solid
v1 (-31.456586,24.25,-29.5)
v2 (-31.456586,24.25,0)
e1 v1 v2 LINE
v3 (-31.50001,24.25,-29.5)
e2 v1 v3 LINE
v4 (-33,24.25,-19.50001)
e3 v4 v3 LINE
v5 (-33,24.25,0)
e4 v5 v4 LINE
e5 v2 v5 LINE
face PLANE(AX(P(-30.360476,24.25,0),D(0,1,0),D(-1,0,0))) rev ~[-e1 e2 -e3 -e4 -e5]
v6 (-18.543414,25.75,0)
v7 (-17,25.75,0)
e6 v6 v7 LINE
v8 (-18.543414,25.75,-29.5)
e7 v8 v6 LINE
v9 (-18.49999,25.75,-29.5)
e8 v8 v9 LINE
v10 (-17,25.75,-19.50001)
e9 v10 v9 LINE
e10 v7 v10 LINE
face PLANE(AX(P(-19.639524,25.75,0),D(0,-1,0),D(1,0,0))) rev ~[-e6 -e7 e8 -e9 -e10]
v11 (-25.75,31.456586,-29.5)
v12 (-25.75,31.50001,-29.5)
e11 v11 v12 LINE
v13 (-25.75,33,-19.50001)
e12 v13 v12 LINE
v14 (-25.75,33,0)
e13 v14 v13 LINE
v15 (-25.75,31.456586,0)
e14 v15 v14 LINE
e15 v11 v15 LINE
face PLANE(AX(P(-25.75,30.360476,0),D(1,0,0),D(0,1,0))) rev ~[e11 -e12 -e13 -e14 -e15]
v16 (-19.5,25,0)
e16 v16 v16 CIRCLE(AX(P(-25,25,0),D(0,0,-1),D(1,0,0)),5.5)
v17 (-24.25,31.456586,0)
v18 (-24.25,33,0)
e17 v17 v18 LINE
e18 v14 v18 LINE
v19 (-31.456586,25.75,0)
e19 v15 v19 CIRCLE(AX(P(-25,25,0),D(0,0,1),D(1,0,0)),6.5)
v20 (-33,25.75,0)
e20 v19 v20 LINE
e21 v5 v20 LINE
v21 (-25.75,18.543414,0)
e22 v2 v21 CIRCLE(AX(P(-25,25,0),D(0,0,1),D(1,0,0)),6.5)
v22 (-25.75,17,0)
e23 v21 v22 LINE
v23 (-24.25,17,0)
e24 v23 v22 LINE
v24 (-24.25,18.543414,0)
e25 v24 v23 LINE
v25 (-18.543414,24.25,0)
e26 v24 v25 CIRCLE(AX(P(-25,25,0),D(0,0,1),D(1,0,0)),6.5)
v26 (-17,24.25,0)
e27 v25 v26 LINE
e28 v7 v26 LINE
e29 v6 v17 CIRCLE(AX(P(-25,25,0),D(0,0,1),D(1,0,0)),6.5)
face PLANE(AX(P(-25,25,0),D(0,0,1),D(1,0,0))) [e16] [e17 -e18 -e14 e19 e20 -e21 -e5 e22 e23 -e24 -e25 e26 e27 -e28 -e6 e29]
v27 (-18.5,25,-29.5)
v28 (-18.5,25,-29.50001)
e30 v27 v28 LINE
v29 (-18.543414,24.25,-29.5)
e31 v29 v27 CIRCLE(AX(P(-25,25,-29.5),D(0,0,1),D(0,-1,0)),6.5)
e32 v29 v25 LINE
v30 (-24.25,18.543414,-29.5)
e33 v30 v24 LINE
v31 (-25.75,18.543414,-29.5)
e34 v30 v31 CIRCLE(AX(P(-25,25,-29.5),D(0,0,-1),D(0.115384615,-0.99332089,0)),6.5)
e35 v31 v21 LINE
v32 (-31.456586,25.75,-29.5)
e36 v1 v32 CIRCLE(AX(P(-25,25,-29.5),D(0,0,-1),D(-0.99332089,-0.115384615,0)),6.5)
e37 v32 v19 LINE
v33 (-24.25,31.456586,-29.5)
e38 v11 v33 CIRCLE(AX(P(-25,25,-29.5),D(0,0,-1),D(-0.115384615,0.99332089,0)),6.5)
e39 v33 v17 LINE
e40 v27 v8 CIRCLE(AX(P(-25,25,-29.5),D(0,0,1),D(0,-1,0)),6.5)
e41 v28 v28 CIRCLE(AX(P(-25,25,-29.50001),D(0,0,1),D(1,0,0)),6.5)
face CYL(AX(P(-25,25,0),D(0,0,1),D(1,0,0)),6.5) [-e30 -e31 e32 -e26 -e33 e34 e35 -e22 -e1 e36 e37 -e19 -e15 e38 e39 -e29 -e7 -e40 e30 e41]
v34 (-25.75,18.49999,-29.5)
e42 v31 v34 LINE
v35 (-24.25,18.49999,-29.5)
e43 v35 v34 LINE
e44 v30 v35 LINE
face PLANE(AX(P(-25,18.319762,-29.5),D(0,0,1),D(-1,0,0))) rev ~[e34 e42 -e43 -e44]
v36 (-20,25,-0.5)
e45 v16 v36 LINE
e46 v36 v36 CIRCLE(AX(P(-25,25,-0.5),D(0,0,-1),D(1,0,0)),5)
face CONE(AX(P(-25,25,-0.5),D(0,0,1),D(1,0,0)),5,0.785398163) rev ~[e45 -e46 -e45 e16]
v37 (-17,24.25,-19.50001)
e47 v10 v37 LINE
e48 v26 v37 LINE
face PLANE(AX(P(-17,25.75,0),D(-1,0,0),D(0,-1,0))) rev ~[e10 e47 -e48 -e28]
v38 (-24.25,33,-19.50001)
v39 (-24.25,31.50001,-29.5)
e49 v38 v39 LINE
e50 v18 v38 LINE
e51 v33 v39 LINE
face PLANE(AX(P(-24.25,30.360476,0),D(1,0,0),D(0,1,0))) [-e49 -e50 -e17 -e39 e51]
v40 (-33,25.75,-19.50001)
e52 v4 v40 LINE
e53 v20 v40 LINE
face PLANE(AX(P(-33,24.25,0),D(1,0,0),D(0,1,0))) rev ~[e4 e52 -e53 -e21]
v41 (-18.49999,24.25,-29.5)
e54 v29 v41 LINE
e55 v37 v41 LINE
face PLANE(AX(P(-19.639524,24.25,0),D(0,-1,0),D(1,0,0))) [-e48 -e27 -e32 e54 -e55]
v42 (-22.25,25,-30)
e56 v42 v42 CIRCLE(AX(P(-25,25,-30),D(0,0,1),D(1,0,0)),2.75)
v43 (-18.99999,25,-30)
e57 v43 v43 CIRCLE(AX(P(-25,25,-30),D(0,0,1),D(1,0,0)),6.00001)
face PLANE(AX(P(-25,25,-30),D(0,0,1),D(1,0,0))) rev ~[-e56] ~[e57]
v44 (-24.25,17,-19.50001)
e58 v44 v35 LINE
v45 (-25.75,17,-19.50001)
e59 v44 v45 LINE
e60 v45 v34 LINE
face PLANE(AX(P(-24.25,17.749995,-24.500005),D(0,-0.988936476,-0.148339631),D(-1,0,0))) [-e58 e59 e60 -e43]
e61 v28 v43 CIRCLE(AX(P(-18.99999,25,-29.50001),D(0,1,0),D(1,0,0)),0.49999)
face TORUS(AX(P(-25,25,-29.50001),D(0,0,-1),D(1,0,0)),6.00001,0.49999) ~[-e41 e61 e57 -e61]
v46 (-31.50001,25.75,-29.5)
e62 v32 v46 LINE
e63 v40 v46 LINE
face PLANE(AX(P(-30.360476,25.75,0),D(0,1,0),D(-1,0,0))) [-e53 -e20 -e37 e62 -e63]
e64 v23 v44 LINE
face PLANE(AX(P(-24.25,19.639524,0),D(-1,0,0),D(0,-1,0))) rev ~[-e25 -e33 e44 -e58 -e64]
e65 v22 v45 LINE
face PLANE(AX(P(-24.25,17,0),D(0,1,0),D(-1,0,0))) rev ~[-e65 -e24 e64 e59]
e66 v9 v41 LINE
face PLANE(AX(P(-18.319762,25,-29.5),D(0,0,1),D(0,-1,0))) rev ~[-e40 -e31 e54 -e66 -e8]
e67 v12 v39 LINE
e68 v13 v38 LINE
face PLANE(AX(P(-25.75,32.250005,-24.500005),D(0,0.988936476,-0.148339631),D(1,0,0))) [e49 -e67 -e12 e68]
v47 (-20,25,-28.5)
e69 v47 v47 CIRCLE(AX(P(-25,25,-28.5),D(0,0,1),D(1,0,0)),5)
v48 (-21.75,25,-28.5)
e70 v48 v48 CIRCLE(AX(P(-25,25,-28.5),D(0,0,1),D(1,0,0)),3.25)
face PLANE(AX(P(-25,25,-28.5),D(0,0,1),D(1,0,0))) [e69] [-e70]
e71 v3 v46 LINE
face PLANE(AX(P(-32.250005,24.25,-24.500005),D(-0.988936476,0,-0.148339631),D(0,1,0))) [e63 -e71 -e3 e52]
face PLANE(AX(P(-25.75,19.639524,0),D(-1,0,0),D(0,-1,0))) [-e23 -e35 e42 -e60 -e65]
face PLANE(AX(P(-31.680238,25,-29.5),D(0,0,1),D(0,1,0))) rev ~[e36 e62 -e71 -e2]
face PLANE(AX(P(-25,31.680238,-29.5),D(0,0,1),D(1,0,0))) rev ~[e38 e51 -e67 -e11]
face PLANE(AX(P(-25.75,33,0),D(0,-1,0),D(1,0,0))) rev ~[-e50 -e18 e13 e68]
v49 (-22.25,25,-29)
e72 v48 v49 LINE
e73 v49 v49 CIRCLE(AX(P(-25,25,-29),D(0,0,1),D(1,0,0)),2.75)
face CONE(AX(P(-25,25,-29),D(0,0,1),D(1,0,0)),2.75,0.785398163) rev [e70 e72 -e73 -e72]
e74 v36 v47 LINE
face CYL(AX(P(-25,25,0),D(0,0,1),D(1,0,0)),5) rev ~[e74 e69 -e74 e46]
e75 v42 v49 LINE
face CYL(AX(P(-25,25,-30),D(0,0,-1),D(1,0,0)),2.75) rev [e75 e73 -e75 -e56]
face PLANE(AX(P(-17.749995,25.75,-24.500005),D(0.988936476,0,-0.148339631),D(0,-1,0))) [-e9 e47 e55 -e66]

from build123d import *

# Parameters (mm, degrees)
F1_R        = 6.5
F1_R_2      = 5
F2_DEPTH    = 30
F4_W        = 1.5
F4_H        = 2.639524132
F5_DEPTH    = 29.5
F6_COUNT    = 4
F8_R        = 5
F8_R_2      = 2.75
F9_DEPTH    = 1.5
F10_SIZE2   = 1.49999
F10_SIZE    = 9.99999
F10_2_SIZE2 = 1.49999
F10_2_SIZE  = 9.99999
F10_3_SIZE2 = 1.49999
F10_3_SIZE  = 9.99999
F10_4_SIZE2 = 1.49999
F10_4_SIZE  = 9.99999
F11_SIZE    = 0.5
F12_R       = 0.49999


# Not quite as in the source:
# - a fillet or chamfer is up to 0.001 mm smaller than in the source, because OpenCascade refuses the exact size


with BuildPart() as f2:
    # F1 (on offset) → F2 (new body)
    with BuildSketch(Plane.XY):
        with Locations((-25, 25)):
            Circle(F1_R)
        with Locations((-25, 25)):
            Circle(F1_R_2, mode=Mode.SUBTRACT)
    extrude(amount=-F2_DEPTH)

    # F4 (on offset) → F5 (join)
    with BuildSketch(Plane.XY):
        with Locations((-25, 31.680237934)):
            Rectangle(F4_W, F4_H)
    extrude(amount=-F5_DEPTH)

    # F6: F2 ×4 about axis
    f6_axis = Axis((-25, 25, 0), (0, 0, 1))


with BuildPart() as f2_1:
    add(f2.part)
    for i in range(1, F6_COUNT):
        add(f2.part.rotate(f6_axis, i * 360 / F6_COUNT))

    # F8 (on offset) → F9 (join)
    with BuildSketch(Plane.XY.offset(-30)):
        with Locations((-25, 25)):
            Circle(F8_R)
        with Locations((-25, 25)):
            Circle(F8_R_2, mode=Mode.SUBTRACT)
    extrude(amount=F9_DEPTH)

    # F10 (size 10 and 1.5 in the source; OpenCascade refuses exactly that, so slightly less here)
    f10_edges = [f2_1.edges().sort_by_distance(p)[0] for p in [
        (-25, 17, -29.5),
    ]]
    f10_side = f2_1.faces().sort_by_distance((-25, 17, -14.75))[0]
    chamfer(f10_edges, length=F10_SIZE, length2=F10_SIZE2, reference=f10_side)

    # F10#2 (size 10 and 1.5 in the source; OpenCascade refuses exactly that, so slightly less here)
    f10_2_edges = [f2_1.edges().sort_by_distance(p)[0] for p in [
        (-17, 25, -29.5),
    ]]
    f10_2_side = f2_1.faces().sort_by_distance((-17, 25, -14.75))[0]
    chamfer(f10_2_edges, length=F10_2_SIZE, length2=F10_2_SIZE2, reference=f10_2_side)

    # F10#3 (size 10 and 1.5 in the source; OpenCascade refuses exactly that, so slightly less here)
    f10_3_edges = [f2_1.edges().sort_by_distance(p)[0] for p in [
        (-25, 33, -29.5),
    ]]
    f10_3_side = f2_1.faces().sort_by_distance((-25, 33, -14.75))[0]
    chamfer(f10_3_edges, length=F10_3_SIZE, length2=F10_3_SIZE2, reference=f10_3_side)

    # F10#4 (size 10 and 1.5 in the source; OpenCascade refuses exactly that, so slightly less here)
    f10_4_edges = [f2_1.edges().sort_by_distance(p)[0] for p in [
        (-33, 25, -29.5),
    ]]
    f10_4_side = f2_1.faces().sort_by_distance((-33, 25, -14.75))[0]
    chamfer(f10_4_edges, length=F10_4_SIZE, length2=F10_4_SIZE2, reference=f10_4_side)

    # F11
    f11_edges = [f2_1.edges().sort_by_distance(p)[0] for p in [
        (-30, 25, 0),
        (-27.75, 25, -28.5),
    ]]
    chamfer(f11_edges, length=F11_SIZE)

    # F12 (radius 0.5 in the source; OpenCascade refuses exactly that, so slightly less here)
    f12_edges = [f2_1.edges().sort_by_distance(p)[0] for p in [
        (-31.5, 25, -30),
    ]]
    fillet(f12_edges, radius=F12_R)


solid = f2_1.part
